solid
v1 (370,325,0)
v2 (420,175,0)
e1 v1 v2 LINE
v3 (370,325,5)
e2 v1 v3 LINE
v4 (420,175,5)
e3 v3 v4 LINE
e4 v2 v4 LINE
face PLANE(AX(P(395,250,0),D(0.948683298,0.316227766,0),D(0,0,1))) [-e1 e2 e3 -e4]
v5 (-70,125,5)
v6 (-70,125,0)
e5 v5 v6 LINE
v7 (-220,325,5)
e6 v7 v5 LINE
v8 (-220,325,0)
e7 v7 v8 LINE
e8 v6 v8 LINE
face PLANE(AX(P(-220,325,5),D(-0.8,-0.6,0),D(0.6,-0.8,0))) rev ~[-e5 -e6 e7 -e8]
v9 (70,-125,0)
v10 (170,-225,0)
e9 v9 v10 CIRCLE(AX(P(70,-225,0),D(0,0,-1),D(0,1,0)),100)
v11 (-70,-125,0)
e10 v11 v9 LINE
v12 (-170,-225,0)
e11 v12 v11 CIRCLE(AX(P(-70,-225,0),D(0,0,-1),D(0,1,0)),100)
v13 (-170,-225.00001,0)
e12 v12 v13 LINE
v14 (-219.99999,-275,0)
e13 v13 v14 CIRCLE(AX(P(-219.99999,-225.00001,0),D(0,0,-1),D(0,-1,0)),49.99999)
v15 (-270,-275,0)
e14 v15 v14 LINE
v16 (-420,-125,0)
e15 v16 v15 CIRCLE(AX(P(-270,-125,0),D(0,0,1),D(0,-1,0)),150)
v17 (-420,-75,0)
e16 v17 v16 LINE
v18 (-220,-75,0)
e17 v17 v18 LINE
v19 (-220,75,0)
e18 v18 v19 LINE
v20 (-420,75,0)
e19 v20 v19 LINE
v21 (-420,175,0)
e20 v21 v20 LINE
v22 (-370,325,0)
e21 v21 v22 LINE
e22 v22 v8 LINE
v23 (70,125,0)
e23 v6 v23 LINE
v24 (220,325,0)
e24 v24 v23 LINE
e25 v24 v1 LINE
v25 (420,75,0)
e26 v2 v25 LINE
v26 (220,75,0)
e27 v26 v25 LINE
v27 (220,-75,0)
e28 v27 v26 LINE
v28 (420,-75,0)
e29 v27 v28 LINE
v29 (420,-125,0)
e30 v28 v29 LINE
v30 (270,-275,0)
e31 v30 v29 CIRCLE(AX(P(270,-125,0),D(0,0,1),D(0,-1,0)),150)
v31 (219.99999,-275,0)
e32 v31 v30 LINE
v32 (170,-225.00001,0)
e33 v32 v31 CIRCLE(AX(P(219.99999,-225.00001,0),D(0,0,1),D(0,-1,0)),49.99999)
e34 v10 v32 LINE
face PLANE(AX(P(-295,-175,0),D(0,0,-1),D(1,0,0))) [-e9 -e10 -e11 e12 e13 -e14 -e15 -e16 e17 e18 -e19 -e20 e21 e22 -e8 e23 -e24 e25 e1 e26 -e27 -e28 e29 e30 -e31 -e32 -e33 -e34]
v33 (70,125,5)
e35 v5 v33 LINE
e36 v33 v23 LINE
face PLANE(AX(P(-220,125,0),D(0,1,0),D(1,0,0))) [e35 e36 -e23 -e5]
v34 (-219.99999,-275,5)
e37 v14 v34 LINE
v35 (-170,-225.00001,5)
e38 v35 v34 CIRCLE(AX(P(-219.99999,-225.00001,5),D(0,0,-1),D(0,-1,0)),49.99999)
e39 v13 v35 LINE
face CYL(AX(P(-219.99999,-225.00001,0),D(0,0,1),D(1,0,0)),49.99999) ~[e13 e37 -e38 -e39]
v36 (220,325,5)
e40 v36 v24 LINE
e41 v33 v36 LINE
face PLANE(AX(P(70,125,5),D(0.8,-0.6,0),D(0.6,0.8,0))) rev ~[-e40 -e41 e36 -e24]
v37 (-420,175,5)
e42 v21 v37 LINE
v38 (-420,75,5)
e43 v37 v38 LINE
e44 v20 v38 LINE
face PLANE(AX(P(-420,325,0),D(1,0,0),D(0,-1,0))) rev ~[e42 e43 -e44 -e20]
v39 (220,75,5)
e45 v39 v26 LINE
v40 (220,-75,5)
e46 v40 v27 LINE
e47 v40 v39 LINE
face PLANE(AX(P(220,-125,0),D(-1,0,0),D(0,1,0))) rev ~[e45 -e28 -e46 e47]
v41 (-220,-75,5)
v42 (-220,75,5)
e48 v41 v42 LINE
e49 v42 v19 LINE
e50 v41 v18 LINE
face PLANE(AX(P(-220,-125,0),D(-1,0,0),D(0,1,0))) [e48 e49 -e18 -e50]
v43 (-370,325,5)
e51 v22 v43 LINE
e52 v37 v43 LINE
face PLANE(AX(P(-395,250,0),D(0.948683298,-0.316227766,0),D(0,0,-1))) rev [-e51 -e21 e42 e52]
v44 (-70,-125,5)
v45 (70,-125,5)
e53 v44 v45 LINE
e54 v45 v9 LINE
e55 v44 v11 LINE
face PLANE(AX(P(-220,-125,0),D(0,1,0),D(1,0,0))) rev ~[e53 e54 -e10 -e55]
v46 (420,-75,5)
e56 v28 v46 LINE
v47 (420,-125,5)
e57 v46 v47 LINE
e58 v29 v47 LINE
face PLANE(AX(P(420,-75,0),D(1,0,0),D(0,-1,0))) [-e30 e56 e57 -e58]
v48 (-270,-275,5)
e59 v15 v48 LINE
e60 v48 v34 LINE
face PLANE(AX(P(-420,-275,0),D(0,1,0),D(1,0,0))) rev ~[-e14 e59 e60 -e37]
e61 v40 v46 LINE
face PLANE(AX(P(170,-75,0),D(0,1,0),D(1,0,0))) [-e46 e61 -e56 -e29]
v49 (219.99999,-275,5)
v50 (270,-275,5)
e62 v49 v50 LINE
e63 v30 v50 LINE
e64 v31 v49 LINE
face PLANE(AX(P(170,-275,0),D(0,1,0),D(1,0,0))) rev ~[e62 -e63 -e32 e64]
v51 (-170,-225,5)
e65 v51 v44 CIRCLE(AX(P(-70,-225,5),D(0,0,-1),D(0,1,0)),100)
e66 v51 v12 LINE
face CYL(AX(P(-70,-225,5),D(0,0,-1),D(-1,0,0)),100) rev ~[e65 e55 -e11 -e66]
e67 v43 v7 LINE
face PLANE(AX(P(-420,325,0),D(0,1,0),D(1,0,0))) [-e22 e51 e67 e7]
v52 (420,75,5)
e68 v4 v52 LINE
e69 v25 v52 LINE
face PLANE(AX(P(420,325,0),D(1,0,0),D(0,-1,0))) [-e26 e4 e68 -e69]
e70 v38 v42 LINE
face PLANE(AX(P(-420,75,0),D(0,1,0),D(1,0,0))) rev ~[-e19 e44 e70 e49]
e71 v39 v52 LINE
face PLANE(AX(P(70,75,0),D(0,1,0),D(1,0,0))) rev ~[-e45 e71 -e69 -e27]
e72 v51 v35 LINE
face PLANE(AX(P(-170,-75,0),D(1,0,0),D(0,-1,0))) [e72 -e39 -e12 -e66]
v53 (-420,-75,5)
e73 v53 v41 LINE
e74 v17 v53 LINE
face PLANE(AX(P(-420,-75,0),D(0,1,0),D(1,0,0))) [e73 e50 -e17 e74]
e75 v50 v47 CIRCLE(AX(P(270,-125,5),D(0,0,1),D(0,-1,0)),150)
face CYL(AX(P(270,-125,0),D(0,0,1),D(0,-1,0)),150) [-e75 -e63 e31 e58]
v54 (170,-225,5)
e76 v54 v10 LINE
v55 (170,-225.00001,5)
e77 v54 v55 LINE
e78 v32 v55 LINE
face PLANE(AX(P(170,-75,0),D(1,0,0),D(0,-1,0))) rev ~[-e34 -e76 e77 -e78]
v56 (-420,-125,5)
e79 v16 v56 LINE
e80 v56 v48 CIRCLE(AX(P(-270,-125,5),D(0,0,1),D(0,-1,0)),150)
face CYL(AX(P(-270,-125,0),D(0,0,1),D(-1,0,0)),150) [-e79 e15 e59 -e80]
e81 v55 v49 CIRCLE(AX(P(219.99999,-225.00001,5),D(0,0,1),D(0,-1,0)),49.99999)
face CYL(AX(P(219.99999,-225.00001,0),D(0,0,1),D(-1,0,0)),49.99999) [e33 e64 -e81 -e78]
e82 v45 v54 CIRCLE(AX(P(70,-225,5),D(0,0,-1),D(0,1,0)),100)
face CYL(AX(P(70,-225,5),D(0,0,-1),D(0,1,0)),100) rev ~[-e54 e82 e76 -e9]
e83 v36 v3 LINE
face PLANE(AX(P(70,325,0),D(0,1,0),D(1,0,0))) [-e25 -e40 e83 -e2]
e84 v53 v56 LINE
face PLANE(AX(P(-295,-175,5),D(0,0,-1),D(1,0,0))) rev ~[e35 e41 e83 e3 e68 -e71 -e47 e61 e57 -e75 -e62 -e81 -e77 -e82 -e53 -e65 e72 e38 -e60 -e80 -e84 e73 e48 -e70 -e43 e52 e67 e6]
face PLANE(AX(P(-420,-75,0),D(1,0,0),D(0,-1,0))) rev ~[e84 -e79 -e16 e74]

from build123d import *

# Parameters (mm, degrees)
F0_W      = 440
F0_H      = 250
F1_DEPTH  = 5
F2_W      = 250
F2_H      = 200
F2_W_2    = 350
F2_H_2    = 250
F3_DEPTH  = 5
F4_R      = 150
F5_R      = 100
F6_R      = 49.99999
F7_SIZE2  = 150
F7_SIZE   = 50
F8_SIZE2  = 50
F8_SIZE   = 150
F10_DEPTH = 25


# Not quite as in the source:
# - a fillet or chamfer is up to 0.001 mm smaller than in the source, because OpenCascade refuses the exact size


with BuildPart() as f1:
    # F0 (on Top) → F1 (new body)
    with BuildSketch(Plane.XY):
        Rectangle(F0_W, F0_H)
    extrude(amount=F1_DEPTH)

    # F2 (on face) → F3 (join)
    with BuildSketch(Plane(origin=(0, 0, 0), x_dir=(1, 0, 0), z_dir=(0, 0, -1))):
        with Locations((-295, 175)):
            Rectangle(F2_W, F2_H)
        with Locations((295, 175)):
            Rectangle(F2_W, F2_H)
        with Locations((-245, -200)):
            Rectangle(F2_W_2, F2_H_2)
        with Locations((245, -200)):
            Rectangle(F2_W_2, F2_H_2)
    extrude(amount=-F3_DEPTH)

    # F4
    f4_edges = [f1.edges().sort_by_distance(p)[0] for p in [
        (-420, -275, 2.5),
        (420, -275, 2.5),
    ]]
    fillet(f4_edges, radius=F4_R)

    # F5
    f5_edges = [f1.edges().sort_by_distance(p)[0] for p in [
        (170, -125, 2.5),
        (-170, -125, 2.5),
    ]]
    fillet(f5_edges, radius=F5_R)

    # F6 (radius 50 in the source; OpenCascade refuses exactly that, so slightly less here)
    f6_edges = [f1.edges().sort_by_distance(p)[0] for p in [
        (-170, -275, 2.5),
        (170, -275, 2.5),
    ]]
    fillet(f6_edges, radius=F6_R)

    # F7
    f7_edges = [f1.edges().sort_by_distance(p)[0] for p in [
        (420, 325, 2.5),
    ]]
    f7_side = f1.faces().sort_by_distance((245, 325, 2.5))[0]
    chamfer(f7_edges, length=F7_SIZE, length2=F7_SIZE2, reference=f7_side)

    # F8
    f8_edges = [f1.edges().sort_by_distance(p)[0] for p in [
        (-420, 325, 2.5),
    ]]
    f8_side = f1.faces().sort_by_distance((-420, 200, 2.5))[0]
    chamfer(f8_edges, length=F8_SIZE, length2=F8_SIZE2, reference=f8_side)

    # F9 (on face) → F10 (cut)
    with BuildSketch(Plane.XY.offset(5)):
        Polygon((-220, 325), (-70, 125), (-70, 325), align=None)
        Polygon((70, 325), (70, 125), (220, 325), align=None)
    extrude(amount=-F10_DEPTH, mode=Mode.SUBTRACT)


solid = f1.part
